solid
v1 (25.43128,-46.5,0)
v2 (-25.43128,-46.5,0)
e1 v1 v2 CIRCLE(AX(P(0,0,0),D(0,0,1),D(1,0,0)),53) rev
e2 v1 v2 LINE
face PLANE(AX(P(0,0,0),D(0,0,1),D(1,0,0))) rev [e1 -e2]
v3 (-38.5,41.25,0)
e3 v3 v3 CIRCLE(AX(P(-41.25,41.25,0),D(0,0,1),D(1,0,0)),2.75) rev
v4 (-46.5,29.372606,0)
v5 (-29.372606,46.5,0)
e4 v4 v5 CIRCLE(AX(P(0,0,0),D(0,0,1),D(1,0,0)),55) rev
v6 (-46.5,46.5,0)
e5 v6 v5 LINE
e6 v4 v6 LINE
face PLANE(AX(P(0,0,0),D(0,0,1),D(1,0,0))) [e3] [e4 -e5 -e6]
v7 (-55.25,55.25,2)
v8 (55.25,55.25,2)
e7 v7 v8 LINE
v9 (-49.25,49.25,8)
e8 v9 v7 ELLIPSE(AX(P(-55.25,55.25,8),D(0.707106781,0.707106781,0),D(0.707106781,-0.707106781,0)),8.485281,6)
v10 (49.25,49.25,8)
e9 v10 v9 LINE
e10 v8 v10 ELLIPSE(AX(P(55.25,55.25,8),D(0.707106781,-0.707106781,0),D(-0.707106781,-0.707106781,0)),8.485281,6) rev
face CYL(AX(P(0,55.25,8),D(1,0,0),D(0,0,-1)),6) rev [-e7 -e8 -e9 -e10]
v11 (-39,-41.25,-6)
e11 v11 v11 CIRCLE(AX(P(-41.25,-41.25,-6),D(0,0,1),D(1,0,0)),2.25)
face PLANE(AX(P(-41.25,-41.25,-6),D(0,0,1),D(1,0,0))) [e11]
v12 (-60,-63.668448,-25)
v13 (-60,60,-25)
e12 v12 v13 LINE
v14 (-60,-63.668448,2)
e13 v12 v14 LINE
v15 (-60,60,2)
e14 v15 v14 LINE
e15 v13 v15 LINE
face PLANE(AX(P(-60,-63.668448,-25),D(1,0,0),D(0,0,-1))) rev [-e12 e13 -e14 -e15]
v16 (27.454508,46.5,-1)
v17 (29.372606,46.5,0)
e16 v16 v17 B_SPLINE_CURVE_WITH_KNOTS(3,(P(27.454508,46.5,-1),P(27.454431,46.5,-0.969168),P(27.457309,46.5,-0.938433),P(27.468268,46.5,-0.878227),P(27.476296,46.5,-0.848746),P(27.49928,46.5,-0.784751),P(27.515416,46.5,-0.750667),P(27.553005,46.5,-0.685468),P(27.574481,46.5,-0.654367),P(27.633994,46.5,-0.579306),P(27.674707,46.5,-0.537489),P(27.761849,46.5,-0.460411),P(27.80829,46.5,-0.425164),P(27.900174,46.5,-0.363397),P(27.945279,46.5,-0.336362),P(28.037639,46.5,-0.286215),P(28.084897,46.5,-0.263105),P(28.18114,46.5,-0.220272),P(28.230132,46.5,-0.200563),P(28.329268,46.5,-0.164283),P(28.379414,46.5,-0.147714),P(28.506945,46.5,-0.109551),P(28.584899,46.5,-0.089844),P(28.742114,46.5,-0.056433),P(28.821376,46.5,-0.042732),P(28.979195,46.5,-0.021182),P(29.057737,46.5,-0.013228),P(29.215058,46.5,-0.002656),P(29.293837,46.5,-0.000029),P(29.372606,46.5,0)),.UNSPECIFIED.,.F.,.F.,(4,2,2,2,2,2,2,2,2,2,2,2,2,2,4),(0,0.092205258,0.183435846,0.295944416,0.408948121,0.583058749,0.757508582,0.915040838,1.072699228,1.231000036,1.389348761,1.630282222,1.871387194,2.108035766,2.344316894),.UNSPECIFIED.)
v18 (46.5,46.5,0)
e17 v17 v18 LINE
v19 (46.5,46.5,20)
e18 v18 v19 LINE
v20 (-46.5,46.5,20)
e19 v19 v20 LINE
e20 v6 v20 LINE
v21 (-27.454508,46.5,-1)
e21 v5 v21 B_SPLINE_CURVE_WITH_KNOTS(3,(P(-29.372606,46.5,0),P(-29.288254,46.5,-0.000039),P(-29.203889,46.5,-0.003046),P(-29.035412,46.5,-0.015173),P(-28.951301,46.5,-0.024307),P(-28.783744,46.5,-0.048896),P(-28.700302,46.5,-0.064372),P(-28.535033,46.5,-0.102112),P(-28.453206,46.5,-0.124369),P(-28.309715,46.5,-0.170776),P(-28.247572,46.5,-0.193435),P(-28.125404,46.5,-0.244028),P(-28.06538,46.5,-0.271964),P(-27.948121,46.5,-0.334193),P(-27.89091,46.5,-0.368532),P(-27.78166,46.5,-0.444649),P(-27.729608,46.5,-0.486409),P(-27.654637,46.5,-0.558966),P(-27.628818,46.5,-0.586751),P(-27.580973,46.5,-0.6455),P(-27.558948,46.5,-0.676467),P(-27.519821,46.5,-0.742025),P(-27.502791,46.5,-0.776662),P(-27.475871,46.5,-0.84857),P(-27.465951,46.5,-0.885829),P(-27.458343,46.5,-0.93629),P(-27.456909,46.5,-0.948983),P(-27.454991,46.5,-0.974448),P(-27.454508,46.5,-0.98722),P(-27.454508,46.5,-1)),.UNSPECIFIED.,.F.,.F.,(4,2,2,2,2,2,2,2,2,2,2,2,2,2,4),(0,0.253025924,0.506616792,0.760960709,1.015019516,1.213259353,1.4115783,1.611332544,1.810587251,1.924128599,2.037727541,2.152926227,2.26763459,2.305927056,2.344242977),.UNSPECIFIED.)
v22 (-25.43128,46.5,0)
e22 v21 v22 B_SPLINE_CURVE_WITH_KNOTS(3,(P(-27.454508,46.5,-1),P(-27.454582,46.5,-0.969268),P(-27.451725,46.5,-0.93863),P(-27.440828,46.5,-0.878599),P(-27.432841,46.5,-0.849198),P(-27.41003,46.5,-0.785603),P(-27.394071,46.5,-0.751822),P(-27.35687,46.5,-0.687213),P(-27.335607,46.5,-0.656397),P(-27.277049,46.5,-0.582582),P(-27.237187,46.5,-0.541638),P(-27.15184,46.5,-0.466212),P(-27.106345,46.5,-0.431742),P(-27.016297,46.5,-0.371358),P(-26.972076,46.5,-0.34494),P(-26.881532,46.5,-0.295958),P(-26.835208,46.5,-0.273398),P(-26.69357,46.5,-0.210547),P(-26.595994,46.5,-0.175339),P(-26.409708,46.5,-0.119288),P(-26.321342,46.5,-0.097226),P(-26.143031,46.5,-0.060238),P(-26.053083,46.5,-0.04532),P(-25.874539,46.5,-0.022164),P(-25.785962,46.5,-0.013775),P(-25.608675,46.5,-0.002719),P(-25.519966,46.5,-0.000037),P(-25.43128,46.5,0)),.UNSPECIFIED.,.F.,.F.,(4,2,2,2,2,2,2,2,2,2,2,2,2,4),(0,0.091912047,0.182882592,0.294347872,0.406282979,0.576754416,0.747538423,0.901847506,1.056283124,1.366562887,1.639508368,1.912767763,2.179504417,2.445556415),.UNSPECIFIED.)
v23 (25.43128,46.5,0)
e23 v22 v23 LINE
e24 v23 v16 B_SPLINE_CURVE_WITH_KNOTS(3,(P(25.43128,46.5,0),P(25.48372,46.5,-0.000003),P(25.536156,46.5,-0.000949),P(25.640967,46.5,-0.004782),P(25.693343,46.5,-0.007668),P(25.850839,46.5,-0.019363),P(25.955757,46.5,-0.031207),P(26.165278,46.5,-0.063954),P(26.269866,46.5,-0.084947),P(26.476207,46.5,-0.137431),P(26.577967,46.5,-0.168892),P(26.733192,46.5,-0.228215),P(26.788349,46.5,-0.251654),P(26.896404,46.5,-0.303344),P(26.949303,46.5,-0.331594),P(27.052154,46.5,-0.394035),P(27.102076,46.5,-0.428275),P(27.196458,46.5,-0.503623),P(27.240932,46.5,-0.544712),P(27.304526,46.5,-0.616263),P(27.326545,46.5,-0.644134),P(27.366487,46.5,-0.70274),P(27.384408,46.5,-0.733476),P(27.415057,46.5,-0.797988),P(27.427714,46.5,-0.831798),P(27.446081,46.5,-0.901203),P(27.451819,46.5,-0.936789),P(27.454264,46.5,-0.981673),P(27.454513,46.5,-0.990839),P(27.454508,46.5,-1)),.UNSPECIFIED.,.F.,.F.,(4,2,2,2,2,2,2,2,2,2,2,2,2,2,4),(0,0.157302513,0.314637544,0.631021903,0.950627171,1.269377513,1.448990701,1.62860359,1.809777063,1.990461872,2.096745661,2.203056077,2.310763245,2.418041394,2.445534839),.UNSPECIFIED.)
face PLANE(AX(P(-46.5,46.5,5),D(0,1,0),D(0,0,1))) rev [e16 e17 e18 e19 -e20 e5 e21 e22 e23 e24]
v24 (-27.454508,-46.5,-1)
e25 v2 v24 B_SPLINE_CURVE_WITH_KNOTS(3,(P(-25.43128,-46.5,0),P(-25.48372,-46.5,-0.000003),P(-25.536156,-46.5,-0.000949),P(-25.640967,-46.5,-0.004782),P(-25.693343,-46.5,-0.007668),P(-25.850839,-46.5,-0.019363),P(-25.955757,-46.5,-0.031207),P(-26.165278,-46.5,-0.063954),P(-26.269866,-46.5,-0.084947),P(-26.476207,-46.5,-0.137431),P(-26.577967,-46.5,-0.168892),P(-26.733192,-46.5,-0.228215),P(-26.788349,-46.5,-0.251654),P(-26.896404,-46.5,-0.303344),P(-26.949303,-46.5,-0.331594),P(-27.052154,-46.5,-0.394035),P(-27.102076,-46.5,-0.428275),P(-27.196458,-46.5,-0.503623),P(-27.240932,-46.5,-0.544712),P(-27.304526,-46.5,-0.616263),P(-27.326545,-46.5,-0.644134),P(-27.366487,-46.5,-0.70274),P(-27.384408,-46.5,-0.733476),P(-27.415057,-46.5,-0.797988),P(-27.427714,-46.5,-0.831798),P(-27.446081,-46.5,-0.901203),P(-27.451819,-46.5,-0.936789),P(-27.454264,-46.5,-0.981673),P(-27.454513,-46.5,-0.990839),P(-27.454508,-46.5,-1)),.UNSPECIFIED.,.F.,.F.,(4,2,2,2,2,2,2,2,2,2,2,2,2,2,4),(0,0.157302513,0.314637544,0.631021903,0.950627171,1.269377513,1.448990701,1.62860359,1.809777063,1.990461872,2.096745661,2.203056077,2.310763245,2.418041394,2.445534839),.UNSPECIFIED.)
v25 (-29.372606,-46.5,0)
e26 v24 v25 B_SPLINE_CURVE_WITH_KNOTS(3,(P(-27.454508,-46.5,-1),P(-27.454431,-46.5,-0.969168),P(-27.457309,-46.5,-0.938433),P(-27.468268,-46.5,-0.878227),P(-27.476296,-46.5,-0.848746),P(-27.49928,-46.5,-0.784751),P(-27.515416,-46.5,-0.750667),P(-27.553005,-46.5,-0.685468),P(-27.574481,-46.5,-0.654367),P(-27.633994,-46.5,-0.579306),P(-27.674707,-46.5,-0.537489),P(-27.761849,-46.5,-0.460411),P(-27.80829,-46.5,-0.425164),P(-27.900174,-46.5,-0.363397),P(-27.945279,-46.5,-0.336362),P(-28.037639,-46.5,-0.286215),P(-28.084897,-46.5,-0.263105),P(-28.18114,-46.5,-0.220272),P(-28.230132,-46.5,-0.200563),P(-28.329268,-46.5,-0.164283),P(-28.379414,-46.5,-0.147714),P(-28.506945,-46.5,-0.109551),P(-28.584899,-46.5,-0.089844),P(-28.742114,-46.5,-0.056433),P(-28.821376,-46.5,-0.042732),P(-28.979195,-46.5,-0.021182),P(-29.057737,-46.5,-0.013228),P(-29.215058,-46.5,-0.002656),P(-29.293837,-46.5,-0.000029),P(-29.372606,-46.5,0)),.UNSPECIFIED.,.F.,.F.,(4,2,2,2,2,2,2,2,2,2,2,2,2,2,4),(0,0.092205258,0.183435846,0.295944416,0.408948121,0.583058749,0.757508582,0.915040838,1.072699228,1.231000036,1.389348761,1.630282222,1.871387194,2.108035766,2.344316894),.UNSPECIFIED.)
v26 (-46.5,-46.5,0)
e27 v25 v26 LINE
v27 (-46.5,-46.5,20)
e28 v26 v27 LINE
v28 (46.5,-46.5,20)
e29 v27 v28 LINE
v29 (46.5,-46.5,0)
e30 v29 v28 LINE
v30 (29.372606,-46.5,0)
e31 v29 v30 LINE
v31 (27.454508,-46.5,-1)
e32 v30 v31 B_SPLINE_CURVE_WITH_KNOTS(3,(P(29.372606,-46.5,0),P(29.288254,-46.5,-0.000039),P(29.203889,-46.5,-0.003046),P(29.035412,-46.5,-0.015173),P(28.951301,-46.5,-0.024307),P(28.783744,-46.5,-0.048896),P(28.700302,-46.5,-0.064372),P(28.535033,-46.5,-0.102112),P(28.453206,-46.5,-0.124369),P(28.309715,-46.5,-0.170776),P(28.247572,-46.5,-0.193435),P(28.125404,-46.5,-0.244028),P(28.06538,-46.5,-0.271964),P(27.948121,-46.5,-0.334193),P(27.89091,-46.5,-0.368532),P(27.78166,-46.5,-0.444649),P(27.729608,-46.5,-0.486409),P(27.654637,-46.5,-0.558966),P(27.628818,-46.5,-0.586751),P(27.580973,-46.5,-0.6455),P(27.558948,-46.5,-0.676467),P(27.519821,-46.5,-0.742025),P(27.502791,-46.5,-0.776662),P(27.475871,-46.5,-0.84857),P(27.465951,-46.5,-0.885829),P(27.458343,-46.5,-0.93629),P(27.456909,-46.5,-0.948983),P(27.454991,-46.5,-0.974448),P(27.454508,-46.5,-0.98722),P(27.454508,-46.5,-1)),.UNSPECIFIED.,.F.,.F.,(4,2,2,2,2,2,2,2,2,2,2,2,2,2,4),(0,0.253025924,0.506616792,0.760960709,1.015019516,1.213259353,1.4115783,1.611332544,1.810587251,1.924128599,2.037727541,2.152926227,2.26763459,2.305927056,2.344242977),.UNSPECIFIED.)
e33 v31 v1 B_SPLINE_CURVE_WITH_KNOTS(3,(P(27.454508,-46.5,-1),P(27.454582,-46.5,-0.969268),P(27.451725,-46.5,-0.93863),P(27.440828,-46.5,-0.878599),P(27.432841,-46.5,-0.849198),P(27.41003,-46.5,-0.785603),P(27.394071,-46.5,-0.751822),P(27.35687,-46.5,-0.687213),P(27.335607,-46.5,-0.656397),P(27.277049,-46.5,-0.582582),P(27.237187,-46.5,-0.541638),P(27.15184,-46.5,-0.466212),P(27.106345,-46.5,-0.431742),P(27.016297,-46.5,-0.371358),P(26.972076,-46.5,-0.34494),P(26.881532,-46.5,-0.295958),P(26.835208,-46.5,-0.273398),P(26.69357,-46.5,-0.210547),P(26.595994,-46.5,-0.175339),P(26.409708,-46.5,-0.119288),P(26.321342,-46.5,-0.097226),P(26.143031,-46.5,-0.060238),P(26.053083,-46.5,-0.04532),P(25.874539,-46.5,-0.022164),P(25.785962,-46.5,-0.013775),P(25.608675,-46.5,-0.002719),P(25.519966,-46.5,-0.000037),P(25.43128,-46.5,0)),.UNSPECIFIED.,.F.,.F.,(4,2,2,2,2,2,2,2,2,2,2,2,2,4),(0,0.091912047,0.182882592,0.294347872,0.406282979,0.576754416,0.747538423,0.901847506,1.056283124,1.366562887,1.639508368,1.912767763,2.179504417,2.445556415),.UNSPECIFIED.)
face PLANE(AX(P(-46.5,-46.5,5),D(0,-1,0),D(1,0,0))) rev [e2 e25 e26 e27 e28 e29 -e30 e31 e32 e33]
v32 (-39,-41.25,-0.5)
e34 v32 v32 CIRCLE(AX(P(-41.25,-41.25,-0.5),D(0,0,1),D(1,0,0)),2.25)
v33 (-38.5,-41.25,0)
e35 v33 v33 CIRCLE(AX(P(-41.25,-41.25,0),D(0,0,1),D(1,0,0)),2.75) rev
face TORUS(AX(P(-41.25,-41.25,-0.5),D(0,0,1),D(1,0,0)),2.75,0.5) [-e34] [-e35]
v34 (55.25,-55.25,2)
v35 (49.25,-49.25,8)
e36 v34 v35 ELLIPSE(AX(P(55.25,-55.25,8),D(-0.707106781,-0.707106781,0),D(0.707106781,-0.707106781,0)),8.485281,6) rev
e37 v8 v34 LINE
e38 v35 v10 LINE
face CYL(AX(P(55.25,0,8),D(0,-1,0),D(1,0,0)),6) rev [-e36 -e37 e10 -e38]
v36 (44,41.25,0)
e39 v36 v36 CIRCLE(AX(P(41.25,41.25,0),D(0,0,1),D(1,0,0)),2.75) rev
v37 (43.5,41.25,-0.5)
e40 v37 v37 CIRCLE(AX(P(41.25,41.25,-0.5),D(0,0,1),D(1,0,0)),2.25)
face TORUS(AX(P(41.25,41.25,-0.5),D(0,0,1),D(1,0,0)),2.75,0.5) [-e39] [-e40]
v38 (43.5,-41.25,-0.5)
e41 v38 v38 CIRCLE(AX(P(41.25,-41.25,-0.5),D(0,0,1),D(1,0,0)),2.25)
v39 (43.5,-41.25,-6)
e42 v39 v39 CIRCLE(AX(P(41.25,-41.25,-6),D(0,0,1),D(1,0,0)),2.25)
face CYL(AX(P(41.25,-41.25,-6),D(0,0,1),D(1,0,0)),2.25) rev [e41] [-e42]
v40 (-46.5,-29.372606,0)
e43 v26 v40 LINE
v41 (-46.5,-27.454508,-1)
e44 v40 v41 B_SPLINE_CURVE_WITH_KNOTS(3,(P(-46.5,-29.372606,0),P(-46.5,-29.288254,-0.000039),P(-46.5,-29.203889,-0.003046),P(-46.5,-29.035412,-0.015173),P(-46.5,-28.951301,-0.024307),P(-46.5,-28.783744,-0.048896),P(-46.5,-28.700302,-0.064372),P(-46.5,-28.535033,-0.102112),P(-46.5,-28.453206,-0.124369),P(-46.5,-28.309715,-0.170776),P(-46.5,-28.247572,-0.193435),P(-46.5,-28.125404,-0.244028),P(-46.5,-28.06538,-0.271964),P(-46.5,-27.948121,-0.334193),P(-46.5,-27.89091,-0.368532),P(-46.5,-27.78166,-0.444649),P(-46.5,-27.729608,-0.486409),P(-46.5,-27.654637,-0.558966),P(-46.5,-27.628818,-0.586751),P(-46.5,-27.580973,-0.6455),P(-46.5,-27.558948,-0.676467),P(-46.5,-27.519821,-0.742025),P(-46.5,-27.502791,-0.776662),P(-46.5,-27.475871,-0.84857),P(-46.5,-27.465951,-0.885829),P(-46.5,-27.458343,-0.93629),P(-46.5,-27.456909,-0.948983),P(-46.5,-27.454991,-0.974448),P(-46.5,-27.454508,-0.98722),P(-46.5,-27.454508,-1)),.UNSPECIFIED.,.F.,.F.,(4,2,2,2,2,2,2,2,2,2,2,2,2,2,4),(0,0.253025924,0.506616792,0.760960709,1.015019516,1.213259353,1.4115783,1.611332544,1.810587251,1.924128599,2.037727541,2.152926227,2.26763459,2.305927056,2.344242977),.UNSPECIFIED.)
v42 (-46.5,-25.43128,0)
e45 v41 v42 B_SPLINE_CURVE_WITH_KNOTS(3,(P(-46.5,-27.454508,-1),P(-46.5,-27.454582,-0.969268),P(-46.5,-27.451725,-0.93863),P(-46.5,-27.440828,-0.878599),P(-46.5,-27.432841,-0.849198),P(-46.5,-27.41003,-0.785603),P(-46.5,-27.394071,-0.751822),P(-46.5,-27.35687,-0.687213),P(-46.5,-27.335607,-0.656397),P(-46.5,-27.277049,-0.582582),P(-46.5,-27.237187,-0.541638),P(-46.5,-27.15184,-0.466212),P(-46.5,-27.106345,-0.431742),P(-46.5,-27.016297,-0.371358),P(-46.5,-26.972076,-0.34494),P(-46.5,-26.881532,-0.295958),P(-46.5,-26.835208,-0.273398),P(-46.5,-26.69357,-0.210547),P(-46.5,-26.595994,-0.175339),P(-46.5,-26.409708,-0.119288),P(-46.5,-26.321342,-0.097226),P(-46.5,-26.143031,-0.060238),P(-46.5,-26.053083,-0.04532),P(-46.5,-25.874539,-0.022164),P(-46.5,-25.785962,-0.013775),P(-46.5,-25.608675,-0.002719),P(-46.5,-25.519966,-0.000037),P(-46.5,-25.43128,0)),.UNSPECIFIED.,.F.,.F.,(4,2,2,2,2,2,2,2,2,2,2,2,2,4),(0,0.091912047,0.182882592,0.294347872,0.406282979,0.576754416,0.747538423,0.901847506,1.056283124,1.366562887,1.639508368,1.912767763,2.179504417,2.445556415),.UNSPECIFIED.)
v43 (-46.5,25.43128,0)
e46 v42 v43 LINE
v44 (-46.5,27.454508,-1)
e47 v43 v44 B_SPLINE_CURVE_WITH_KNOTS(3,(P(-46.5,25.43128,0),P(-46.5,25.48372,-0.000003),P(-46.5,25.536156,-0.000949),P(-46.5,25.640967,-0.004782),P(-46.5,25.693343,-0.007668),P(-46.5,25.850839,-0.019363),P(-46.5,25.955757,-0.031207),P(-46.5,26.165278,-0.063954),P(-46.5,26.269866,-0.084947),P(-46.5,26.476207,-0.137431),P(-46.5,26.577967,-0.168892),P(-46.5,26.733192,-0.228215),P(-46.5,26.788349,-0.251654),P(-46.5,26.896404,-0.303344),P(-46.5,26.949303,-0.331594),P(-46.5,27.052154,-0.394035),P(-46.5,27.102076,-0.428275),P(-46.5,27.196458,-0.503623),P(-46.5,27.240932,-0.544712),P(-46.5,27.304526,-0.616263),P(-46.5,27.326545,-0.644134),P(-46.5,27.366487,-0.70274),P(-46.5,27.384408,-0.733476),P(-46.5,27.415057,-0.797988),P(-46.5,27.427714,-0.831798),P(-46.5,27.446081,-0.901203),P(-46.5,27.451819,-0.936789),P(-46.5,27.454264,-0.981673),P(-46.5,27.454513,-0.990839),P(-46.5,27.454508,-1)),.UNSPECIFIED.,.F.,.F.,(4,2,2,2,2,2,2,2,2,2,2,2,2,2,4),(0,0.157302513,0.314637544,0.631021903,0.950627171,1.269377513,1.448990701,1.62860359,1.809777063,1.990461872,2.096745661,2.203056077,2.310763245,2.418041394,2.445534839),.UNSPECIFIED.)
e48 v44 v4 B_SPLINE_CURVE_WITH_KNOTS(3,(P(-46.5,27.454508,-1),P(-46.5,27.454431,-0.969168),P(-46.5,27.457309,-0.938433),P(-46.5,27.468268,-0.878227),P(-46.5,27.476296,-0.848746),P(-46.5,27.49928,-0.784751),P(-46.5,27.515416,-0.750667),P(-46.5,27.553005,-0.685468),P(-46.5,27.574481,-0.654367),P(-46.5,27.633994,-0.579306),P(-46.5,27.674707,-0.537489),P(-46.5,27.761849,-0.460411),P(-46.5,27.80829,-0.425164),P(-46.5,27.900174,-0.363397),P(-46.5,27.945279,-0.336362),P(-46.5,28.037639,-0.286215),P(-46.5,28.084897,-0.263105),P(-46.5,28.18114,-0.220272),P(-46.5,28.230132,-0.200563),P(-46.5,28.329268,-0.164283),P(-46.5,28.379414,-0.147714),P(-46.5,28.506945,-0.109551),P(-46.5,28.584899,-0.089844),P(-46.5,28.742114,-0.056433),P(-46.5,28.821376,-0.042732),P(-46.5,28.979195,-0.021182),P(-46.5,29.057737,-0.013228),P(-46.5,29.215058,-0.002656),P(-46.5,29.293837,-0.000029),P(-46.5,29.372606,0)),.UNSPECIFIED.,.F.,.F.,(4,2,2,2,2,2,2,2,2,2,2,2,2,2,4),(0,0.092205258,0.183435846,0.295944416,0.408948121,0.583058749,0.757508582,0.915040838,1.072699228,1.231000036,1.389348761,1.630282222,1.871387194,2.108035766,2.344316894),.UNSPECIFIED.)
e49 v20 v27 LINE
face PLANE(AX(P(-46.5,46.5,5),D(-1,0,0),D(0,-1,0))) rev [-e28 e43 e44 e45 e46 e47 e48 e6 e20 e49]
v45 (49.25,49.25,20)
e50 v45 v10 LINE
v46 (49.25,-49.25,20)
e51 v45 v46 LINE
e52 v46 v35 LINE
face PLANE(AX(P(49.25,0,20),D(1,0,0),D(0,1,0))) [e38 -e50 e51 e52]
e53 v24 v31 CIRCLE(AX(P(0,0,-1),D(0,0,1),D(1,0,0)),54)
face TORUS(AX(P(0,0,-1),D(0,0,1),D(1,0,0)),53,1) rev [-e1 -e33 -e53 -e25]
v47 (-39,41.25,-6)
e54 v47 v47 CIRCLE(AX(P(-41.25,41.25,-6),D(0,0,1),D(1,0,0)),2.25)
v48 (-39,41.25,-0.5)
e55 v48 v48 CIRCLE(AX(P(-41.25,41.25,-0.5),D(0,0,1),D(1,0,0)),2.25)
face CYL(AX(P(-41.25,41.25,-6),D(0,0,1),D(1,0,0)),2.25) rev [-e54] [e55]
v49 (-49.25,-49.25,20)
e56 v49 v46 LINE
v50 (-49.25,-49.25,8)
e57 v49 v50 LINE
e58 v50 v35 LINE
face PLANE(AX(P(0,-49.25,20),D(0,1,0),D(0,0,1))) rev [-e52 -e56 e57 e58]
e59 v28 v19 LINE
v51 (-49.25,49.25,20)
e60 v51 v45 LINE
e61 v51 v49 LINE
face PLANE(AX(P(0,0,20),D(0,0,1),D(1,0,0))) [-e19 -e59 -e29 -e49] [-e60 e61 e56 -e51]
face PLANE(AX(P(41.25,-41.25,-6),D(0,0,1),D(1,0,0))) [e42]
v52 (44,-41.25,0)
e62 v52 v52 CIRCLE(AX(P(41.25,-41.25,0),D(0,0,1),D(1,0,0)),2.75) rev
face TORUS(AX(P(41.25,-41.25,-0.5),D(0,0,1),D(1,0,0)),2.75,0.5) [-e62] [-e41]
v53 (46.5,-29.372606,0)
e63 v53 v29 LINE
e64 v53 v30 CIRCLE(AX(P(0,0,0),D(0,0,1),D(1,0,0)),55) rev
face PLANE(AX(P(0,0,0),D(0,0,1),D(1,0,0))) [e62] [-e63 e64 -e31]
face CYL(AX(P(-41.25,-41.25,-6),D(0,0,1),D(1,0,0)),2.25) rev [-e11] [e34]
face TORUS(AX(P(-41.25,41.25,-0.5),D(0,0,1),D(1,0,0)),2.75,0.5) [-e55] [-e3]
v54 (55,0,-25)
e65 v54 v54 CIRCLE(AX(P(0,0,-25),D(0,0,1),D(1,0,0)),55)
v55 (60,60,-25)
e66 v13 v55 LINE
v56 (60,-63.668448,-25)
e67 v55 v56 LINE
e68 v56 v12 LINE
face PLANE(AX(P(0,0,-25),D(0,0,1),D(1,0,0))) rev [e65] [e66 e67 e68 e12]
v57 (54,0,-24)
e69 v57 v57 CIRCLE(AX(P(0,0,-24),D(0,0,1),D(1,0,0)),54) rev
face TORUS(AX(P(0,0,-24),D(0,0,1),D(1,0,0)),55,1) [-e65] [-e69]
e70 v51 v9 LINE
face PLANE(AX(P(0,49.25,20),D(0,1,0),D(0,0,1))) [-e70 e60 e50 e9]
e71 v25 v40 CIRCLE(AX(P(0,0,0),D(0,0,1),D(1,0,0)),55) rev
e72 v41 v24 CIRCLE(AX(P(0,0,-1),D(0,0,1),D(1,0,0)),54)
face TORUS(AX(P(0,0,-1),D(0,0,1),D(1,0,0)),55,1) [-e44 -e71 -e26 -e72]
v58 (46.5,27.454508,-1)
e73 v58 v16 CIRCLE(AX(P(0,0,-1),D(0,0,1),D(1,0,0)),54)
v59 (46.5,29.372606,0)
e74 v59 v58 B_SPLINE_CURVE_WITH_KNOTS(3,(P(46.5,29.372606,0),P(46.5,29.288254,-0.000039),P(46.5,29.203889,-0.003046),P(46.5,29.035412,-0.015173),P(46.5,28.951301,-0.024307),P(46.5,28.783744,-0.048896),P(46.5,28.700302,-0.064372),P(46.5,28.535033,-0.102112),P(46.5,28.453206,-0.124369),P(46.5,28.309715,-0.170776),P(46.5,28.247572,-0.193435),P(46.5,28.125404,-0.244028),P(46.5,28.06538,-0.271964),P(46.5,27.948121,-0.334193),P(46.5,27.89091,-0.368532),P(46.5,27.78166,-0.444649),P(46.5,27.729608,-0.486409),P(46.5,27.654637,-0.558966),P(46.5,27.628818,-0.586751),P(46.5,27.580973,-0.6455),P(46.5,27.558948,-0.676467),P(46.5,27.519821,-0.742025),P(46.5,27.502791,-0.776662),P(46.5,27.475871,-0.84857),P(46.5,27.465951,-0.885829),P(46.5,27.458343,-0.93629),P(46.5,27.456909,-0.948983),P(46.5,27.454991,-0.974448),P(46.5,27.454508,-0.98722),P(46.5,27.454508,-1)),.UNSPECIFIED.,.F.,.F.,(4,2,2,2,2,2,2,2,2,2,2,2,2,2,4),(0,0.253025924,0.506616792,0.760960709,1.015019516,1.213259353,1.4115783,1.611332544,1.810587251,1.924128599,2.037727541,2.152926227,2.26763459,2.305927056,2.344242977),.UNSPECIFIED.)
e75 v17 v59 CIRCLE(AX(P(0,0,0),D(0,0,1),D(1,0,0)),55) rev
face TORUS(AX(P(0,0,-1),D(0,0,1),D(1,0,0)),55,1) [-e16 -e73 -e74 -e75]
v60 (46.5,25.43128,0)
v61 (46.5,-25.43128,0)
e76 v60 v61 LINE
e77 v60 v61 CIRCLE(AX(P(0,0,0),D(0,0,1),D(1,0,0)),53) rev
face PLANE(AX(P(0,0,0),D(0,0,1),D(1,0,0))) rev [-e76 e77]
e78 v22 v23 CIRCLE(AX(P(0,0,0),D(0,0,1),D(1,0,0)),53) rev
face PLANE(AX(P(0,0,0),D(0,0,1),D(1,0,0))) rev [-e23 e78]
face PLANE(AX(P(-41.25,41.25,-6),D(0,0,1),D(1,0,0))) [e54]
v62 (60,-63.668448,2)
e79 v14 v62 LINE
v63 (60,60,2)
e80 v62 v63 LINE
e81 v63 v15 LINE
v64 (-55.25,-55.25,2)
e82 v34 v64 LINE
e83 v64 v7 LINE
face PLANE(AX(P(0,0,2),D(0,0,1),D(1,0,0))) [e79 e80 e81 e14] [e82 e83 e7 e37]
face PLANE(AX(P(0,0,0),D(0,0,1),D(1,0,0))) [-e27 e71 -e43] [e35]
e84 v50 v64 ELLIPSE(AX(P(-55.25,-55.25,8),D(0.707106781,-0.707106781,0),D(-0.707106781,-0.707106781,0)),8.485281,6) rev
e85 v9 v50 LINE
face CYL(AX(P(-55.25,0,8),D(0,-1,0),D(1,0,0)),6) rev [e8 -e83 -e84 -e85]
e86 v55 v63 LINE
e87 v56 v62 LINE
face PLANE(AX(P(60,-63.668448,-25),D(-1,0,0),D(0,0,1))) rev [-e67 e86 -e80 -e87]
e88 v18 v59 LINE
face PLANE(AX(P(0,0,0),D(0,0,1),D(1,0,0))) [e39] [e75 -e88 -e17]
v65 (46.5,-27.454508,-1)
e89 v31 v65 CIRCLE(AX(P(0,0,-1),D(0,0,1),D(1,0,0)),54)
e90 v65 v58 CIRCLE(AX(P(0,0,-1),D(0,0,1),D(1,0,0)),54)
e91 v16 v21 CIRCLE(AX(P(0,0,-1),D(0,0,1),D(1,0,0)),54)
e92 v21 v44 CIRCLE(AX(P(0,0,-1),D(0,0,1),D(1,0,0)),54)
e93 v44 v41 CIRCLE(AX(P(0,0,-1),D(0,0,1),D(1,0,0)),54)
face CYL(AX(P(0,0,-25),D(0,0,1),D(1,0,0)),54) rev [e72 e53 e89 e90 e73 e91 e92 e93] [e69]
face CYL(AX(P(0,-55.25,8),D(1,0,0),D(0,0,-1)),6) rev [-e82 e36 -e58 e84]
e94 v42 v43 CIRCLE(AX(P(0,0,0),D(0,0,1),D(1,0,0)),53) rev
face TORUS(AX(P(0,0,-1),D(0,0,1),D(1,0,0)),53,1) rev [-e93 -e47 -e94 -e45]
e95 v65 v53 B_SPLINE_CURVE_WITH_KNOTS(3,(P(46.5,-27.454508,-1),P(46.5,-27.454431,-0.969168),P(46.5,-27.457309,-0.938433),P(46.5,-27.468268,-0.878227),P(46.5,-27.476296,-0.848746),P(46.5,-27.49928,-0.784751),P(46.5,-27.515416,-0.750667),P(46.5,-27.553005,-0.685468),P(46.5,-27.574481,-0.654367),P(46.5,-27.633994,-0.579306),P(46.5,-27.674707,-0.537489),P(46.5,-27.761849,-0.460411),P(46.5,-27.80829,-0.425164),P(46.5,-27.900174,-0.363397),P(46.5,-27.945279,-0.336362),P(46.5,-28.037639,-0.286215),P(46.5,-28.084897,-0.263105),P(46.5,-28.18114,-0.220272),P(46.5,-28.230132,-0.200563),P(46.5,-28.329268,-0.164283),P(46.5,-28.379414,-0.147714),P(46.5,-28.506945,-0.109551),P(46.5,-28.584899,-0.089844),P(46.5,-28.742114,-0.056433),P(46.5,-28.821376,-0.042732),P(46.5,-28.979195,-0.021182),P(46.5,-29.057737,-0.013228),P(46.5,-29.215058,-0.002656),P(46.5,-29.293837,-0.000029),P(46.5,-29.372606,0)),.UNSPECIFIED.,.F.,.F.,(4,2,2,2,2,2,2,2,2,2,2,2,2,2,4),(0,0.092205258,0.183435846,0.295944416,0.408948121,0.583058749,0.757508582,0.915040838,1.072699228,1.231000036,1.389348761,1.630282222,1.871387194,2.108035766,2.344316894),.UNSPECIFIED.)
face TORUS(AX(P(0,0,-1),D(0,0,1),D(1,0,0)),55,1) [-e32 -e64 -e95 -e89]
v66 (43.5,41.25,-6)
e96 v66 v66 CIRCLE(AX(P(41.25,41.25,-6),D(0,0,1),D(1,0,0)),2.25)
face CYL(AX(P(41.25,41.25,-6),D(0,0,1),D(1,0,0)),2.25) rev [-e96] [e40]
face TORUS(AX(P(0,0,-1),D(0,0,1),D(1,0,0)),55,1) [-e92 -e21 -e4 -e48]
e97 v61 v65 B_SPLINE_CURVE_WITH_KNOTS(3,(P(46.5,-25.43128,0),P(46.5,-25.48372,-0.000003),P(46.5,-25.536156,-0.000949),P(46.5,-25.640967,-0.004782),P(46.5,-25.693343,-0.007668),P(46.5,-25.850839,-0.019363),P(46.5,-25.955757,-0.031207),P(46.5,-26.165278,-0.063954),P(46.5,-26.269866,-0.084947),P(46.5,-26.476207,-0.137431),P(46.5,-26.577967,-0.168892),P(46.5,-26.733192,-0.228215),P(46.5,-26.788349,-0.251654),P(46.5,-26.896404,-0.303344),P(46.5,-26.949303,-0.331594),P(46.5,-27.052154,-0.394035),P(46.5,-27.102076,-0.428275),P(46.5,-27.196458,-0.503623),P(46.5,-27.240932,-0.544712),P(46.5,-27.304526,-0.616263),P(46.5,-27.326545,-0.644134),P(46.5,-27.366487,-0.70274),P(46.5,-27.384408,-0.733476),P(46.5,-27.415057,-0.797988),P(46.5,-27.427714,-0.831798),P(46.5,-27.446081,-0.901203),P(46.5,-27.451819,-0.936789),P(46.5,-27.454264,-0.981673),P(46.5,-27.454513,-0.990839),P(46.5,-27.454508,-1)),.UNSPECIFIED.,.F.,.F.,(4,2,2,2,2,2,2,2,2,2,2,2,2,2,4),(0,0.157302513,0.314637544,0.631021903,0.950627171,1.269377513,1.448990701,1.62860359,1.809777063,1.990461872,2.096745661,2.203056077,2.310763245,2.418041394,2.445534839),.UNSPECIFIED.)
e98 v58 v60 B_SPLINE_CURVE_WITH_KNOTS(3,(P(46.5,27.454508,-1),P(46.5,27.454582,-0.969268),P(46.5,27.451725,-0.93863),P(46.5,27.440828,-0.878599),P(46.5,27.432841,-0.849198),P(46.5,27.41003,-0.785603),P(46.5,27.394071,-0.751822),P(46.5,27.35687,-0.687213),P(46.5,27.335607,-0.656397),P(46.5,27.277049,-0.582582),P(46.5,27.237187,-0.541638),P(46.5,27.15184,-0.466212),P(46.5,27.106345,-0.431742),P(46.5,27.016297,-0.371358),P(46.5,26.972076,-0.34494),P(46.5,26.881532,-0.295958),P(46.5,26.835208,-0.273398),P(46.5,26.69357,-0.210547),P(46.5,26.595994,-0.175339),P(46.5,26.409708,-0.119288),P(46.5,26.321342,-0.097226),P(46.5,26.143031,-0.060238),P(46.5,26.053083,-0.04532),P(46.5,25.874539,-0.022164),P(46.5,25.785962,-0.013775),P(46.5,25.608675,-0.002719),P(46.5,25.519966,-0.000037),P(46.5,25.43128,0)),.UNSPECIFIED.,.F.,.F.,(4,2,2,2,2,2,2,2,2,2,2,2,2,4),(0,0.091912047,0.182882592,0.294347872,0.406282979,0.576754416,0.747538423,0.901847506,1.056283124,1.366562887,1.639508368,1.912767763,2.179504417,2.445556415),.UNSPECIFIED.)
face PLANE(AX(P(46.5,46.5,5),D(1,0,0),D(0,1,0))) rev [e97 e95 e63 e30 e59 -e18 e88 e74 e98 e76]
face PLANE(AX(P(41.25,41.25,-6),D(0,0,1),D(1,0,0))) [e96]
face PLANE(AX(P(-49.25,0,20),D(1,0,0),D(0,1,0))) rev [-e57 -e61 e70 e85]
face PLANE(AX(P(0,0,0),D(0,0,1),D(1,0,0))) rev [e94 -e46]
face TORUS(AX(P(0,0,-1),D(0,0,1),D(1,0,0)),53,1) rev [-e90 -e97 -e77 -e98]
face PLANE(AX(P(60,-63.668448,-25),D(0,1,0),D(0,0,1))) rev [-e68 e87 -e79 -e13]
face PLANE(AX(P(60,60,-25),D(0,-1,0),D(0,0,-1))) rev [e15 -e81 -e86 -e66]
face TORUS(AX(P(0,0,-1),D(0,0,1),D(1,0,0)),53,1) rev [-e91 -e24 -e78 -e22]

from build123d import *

# Parameters (mm, degrees)
SKIZZE1_W                       = 98.5
SKIZZE1_H                       = 98.5
SKIZZE1_W_2                     = 90.5
SKIZZE1_H_2                     = 90.5
AUFSATZ_LINEAR_AUSTRAGEN2_DEPTH = 20
SKIZZE11_W                      = 93
SKIZZE11_H                      = 93
SCHNITT_LINEAR_AUSTRAGEN2_DEPTH = 15
SKIZZE12_W                      = 120
SKIZZE12_H                      = 123.668448402
SKIZZE12_R                      = 54
AUFSATZ_LINEAR_AUSTRAGEN6_DEPTH = 25
SKIZZE15_W                      = 120
SKIZZE15_H                      = 123.668448402
SKIZZE15_W_2                    = 98.5
SKIZZE15_H_2                    = 98.5
AUFSATZ_LINEAR_AUSTRAGEN8_DEPTH = 2
SKIZZE16_W                      = 93
SKIZZE16_H                      = 93
SCHNITT_LINEAR_AUSTRAGEN3_DEPTH = 5
SKIZZE17_R                      = 2.25
SCHNITT_LINEAR_AUSTRAGEN4_DEPTH = 6
VERRUNDUNG1_R                   = 0.5
VERRUNDUNG3_R                   = 1
VERRUNDUNG5_R                   = 1
VERRUNDUNG7_R                   = 1
VERRUNDUNG8_R                   = 6


with BuildPart() as part:
    # Skizze1 → Aufsatz-Linear austragen2 (new body)
    # profile 1 of 5: a face of its own
    with BuildSketch(Plane.XY):
        Rectangle(SKIZZE1_W, SKIZZE1_H)
        Rectangle(SKIZZE1_W_2, SKIZZE1_H_2, mode=Mode.SUBTRACT)
    # profile 2 of 5: a face of its own
    with BuildSketch(Plane.XY):
        with BuildLine():
            Line((-45.25, 45.25), (-45.25, 21.270578271))
            ThreePointArc((-45.25, 21.270578271), (-35.355339059, 35.355339059), (-21.270578271, 45.25))
            Line((-21.270578271, 45.25), (-45.25, 45.25))
        make_face()
    # profile 3 of 5: a face of its own
    with BuildSketch(Plane.XY):
        with BuildLine():
            ThreePointArc((21.270578271, 45.25), (35.355339059, 35.355339059), (45.25, 21.270578271))
            Line((45.25, 21.270578271), (45.25, 45.25))
            Line((45.25, 45.25), (21.270578271, 45.25))
        make_face()
    # profile 4 of 5: a face of its own
    with BuildSketch(Plane.XY):
        with BuildLine():
            ThreePointArc((45.25, -21.270578271), (35.355339059, -35.355339059), (21.270578271, -45.25))
            Line((21.270578271, -45.25), (45.25, -45.25))
            Line((45.25, -45.25), (45.25, -21.270578271))
        make_face()
    # profile 5 of 5: a face of its own
    with BuildSketch(Plane.XY):
        with BuildLine():
            Line((-45.25, -21.270578271), (-45.25, -45.25))
            Line((-45.25, -45.25), (-21.270578271, -45.25))
            ThreePointArc((-21.270578271, -45.25), (-35.355339059, -35.355339059), (-45.25, -21.270578271))
        make_face()
    extrude(amount=AUFSATZ_LINEAR_AUSTRAGEN2_DEPTH)

    # Skizze11 → Schnitt-Linear austragen2 (cut)
    with BuildSketch(Plane.XY.offset(20)):
        Rectangle(SKIZZE11_W, SKIZZE11_H)
    extrude(amount=-SCHNITT_LINEAR_AUSTRAGEN2_DEPTH, mode=Mode.SUBTRACT)

    # Skizze12 → Aufsatz-Linear austragen6 (add)
    with BuildSketch(Plane(origin=(0, 0, 0), x_dir=(-1, 0, 0), z_dir=(0, 0, -1))):
        with Locations((0, -1.834224201)):
            Rectangle(SKIZZE12_W, SKIZZE12_H)
        with Locations(Location((0, 0, 0), (0, 0, 155.788390477))):
            Circle(SKIZZE12_R, mode=Mode.SUBTRACT)
    extrude(amount=AUFSATZ_LINEAR_AUSTRAGEN6_DEPTH)

    # Skizze15 → Aufsatz-Linear austragen8 (add)
    with BuildSketch(Plane.XY):
        with Locations((0, -1.834224201)):
            Rectangle(SKIZZE15_W, SKIZZE15_H)
        Rectangle(SKIZZE15_W_2, SKIZZE15_H_2, mode=Mode.SUBTRACT)
    extrude(amount=AUFSATZ_LINEAR_AUSTRAGEN8_DEPTH)

    # Skizze16 → Schnitt-Linear austragen3 (cut)
    with BuildSketch(Plane.XY.offset(5)):
        Rectangle(SKIZZE16_W, SKIZZE16_H)
    extrude(amount=-SCHNITT_LINEAR_AUSTRAGEN3_DEPTH, mode=Mode.SUBTRACT)

    # Skizze17 → Schnitt-Linear austragen4 (cut)
    with BuildSketch(Plane.XY):
        with Locations((41.25, -41.25)):
            Circle(SKIZZE17_R)
        with Locations((-41.25, -41.25)):
            Circle(SKIZZE17_R)
        with Locations((-41.25, 41.25)):
            Circle(SKIZZE17_R)
        with Locations((41.25, 41.25)):
            Circle(SKIZZE17_R)
    extrude(amount=-SCHNITT_LINEAR_AUSTRAGEN4_DEPTH, mode=Mode.SUBTRACT)

    # Verrundung1
    verrundung1_edges = [part.edges().sort_by_distance(p)[0] for p in [
        (39, 41.25, 0),
        (-43.5, 41.25, 0),
        (-43.5, -41.25, 0),
        (39, -41.25, 0),
    ]]
    fillet(verrundung1_edges, radius=VERRUNDUNG1_R)

    # Verrundung3
    # the kernel refuses this fillet: 1 mm, written as the material it adds along each edge
    with BuildSketch(Plane(origin=(0, 0, 0), x_dir=(0.5477312417776574, 0.8366543412788254, 0), z_dir=(0.8366543412788254, -0.5477312417776574, 0))) as verrundung3_piece_1_section:
        with BuildLine():
            CenterArc((54 - VERRUNDUNG3_R, -VERRUNDUNG3_R), VERRUNDUNG3_R, 0, 90)
            Line((54 - VERRUNDUNG3_R, 0), (54, 0))
            Line((54, 0), (54, -VERRUNDUNG3_R))
        make_face()
    verrundung3_piece_1 = revolve(axis=Axis((0, 0, 0), (0, 0, 1)), revolution_arc=66.423010951, mode=Mode.PRIVATE)
    verrundung3_piece_1 = split(verrundung3_piece_1, bisect_by=Plane(origin=(0, 46.5, -0.276639056), z_dir=(0, 1, 0)), keep=Keep.TOP, mode=Mode.PRIVATE)
    add(verrundung3_piece_1)
    with BuildSketch(Plane(origin=(0, 0, 0), x_dir=(0.8366552662090209, -0.5477298289528446, 0), z_dir=(-0.5477298289528446, -0.8366552662090209, 0))) as verrundung3_piece_2_section:
        with BuildLine():
            CenterArc((54 - VERRUNDUNG3_R, -VERRUNDUNG3_R), VERRUNDUNG3_R, 0, 90)
            Line((54 - VERRUNDUNG3_R, 0), (54, 0))
            Line((54, 0), (54, -VERRUNDUNG3_R))
        make_face()
    verrundung3_piece_2 = revolve(axis=Axis((0, 0, 0), (0, 0, 1)), revolution_arc=57.423018245, mode=Mode.PRIVATE)
    verrundung3_piece_2 = split(verrundung3_piece_2, bisect_by=Plane(origin=(46.5, -2.973995803, -0.277191271), z_dir=(1, 0, 0)), keep=Keep.TOP, mode=Mode.PRIVATE)
    add(verrundung3_piece_2)
    with BuildSketch(Plane(origin=(0, 0, 0), x_dir=(-0.5477312417775408, -0.8366543412789017, 0), z_dir=(-0.8366543412789017, 0.5477312417775408, 0))) as verrundung3_piece_3_section:
        with BuildLine():
            CenterArc((54 - VERRUNDUNG3_R, -VERRUNDUNG3_R), VERRUNDUNG3_R, 0, 90)
            Line((54 - VERRUNDUNG3_R, 0), (54, 0))
            Line((54, 0), (54, -VERRUNDUNG3_R))
        make_face()
    verrundung3_piece_3 = revolve(axis=Axis((0, 0, 0), (0, 0, 1)), revolution_arc=66.423010951, mode=Mode.PRIVATE)
    verrundung3_piece_3 = split(verrundung3_piece_3, bisect_by=Plane(origin=(0, -46.5, -0.276639056), z_dir=(0, -1, 0)), keep=Keep.TOP, mode=Mode.PRIVATE)
    add(verrundung3_piece_3)
    with BuildSketch(Plane(origin=(0, 0, 0), x_dir=(-0.8366543412788674, 0.5477312417775932, 0), z_dir=(0.5477312417775932, 0.8366543412788674, 0))) as verrundung3_piece_4_section:
        with BuildLine():
            CenterArc((54 - VERRUNDUNG3_R, -VERRUNDUNG3_R), VERRUNDUNG3_R, 0, 90)
            Line((54 - VERRUNDUNG3_R, 0), (54, 0))
            Line((54, 0), (54, -VERRUNDUNG3_R))
        make_face()
    verrundung3_piece_4 = revolve(axis=Axis((0, 0, 0), (0, 0, 1)), revolution_arc=66.423010951, mode=Mode.PRIVATE)
    verrundung3_piece_4 = split(verrundung3_piece_4, bisect_by=Plane(origin=(-46.5, 0, -0.276639056), z_dir=(-1, 0, 0)), keep=Keep.TOP, mode=Mode.PRIVATE)
    add(verrundung3_piece_4)
    with BuildSketch(Plane(origin=(0, 0, 0), x_dir=(0.9120370370393823, 0.41010784321739613, 0), z_dir=(0.41010784321739613, -0.9120370370393823, 0))) as verrundung3_piece_5_section:
        with BuildLine():
            CenterArc((54 - VERRUNDUNG3_R, -VERRUNDUNG3_R), VERRUNDUNG3_R, 0, 90)
            Line((54 - VERRUNDUNG3_R, 0), (54, 0))
            Line((54, 0), (54, -VERRUNDUNG3_R))
        make_face()
    verrundung3_piece_5 = revolve(axis=Axis((0, 0, 0), (0, 0, 1)), revolution_arc=8.999409945, mode=Mode.PRIVATE)
    verrundung3_piece_5 = split(verrundung3_piece_5, bisect_by=Plane(origin=(46.5, 24.568591389, -0.23016125), z_dir=(1, 0, 0)), keep=Keep.TOP, mode=Mode.PRIVATE)
    add(verrundung3_piece_5)

    # Verrundung5
    verrundung5_edges = [part.edges().sort_by_distance(p)[0] for p in [
        (-49.25, -22.145823534, -25),
    ]]
    fillet(verrundung5_edges, radius=VERRUNDUNG5_R)

    # Verrundung7
    verrundung7_edges = [part.edges().sort_by_distance(p)[0] for p in [
        (-38.183766184, -38.183766184, 0),
        (38.183766184, -38.183766184, 0),
        (38.183766184, 38.183766184, 0),
        (-38.183766184, 38.183766184, 0),
    ]]
    fillet(verrundung7_edges, radius=VERRUNDUNG7_R)

    # Verrundung8
    verrundung8_edges = [part.edges().sort_by_distance(p)[0] for p in [
        (49.25, 0, 2),
        (0, 49.25, 2),
        (-49.25, 0, 2),
        (0, -49.25, 2),
    ]]
    fillet(verrundung8_edges, radius=VERRUNDUNG8_R)


solid = part.part
